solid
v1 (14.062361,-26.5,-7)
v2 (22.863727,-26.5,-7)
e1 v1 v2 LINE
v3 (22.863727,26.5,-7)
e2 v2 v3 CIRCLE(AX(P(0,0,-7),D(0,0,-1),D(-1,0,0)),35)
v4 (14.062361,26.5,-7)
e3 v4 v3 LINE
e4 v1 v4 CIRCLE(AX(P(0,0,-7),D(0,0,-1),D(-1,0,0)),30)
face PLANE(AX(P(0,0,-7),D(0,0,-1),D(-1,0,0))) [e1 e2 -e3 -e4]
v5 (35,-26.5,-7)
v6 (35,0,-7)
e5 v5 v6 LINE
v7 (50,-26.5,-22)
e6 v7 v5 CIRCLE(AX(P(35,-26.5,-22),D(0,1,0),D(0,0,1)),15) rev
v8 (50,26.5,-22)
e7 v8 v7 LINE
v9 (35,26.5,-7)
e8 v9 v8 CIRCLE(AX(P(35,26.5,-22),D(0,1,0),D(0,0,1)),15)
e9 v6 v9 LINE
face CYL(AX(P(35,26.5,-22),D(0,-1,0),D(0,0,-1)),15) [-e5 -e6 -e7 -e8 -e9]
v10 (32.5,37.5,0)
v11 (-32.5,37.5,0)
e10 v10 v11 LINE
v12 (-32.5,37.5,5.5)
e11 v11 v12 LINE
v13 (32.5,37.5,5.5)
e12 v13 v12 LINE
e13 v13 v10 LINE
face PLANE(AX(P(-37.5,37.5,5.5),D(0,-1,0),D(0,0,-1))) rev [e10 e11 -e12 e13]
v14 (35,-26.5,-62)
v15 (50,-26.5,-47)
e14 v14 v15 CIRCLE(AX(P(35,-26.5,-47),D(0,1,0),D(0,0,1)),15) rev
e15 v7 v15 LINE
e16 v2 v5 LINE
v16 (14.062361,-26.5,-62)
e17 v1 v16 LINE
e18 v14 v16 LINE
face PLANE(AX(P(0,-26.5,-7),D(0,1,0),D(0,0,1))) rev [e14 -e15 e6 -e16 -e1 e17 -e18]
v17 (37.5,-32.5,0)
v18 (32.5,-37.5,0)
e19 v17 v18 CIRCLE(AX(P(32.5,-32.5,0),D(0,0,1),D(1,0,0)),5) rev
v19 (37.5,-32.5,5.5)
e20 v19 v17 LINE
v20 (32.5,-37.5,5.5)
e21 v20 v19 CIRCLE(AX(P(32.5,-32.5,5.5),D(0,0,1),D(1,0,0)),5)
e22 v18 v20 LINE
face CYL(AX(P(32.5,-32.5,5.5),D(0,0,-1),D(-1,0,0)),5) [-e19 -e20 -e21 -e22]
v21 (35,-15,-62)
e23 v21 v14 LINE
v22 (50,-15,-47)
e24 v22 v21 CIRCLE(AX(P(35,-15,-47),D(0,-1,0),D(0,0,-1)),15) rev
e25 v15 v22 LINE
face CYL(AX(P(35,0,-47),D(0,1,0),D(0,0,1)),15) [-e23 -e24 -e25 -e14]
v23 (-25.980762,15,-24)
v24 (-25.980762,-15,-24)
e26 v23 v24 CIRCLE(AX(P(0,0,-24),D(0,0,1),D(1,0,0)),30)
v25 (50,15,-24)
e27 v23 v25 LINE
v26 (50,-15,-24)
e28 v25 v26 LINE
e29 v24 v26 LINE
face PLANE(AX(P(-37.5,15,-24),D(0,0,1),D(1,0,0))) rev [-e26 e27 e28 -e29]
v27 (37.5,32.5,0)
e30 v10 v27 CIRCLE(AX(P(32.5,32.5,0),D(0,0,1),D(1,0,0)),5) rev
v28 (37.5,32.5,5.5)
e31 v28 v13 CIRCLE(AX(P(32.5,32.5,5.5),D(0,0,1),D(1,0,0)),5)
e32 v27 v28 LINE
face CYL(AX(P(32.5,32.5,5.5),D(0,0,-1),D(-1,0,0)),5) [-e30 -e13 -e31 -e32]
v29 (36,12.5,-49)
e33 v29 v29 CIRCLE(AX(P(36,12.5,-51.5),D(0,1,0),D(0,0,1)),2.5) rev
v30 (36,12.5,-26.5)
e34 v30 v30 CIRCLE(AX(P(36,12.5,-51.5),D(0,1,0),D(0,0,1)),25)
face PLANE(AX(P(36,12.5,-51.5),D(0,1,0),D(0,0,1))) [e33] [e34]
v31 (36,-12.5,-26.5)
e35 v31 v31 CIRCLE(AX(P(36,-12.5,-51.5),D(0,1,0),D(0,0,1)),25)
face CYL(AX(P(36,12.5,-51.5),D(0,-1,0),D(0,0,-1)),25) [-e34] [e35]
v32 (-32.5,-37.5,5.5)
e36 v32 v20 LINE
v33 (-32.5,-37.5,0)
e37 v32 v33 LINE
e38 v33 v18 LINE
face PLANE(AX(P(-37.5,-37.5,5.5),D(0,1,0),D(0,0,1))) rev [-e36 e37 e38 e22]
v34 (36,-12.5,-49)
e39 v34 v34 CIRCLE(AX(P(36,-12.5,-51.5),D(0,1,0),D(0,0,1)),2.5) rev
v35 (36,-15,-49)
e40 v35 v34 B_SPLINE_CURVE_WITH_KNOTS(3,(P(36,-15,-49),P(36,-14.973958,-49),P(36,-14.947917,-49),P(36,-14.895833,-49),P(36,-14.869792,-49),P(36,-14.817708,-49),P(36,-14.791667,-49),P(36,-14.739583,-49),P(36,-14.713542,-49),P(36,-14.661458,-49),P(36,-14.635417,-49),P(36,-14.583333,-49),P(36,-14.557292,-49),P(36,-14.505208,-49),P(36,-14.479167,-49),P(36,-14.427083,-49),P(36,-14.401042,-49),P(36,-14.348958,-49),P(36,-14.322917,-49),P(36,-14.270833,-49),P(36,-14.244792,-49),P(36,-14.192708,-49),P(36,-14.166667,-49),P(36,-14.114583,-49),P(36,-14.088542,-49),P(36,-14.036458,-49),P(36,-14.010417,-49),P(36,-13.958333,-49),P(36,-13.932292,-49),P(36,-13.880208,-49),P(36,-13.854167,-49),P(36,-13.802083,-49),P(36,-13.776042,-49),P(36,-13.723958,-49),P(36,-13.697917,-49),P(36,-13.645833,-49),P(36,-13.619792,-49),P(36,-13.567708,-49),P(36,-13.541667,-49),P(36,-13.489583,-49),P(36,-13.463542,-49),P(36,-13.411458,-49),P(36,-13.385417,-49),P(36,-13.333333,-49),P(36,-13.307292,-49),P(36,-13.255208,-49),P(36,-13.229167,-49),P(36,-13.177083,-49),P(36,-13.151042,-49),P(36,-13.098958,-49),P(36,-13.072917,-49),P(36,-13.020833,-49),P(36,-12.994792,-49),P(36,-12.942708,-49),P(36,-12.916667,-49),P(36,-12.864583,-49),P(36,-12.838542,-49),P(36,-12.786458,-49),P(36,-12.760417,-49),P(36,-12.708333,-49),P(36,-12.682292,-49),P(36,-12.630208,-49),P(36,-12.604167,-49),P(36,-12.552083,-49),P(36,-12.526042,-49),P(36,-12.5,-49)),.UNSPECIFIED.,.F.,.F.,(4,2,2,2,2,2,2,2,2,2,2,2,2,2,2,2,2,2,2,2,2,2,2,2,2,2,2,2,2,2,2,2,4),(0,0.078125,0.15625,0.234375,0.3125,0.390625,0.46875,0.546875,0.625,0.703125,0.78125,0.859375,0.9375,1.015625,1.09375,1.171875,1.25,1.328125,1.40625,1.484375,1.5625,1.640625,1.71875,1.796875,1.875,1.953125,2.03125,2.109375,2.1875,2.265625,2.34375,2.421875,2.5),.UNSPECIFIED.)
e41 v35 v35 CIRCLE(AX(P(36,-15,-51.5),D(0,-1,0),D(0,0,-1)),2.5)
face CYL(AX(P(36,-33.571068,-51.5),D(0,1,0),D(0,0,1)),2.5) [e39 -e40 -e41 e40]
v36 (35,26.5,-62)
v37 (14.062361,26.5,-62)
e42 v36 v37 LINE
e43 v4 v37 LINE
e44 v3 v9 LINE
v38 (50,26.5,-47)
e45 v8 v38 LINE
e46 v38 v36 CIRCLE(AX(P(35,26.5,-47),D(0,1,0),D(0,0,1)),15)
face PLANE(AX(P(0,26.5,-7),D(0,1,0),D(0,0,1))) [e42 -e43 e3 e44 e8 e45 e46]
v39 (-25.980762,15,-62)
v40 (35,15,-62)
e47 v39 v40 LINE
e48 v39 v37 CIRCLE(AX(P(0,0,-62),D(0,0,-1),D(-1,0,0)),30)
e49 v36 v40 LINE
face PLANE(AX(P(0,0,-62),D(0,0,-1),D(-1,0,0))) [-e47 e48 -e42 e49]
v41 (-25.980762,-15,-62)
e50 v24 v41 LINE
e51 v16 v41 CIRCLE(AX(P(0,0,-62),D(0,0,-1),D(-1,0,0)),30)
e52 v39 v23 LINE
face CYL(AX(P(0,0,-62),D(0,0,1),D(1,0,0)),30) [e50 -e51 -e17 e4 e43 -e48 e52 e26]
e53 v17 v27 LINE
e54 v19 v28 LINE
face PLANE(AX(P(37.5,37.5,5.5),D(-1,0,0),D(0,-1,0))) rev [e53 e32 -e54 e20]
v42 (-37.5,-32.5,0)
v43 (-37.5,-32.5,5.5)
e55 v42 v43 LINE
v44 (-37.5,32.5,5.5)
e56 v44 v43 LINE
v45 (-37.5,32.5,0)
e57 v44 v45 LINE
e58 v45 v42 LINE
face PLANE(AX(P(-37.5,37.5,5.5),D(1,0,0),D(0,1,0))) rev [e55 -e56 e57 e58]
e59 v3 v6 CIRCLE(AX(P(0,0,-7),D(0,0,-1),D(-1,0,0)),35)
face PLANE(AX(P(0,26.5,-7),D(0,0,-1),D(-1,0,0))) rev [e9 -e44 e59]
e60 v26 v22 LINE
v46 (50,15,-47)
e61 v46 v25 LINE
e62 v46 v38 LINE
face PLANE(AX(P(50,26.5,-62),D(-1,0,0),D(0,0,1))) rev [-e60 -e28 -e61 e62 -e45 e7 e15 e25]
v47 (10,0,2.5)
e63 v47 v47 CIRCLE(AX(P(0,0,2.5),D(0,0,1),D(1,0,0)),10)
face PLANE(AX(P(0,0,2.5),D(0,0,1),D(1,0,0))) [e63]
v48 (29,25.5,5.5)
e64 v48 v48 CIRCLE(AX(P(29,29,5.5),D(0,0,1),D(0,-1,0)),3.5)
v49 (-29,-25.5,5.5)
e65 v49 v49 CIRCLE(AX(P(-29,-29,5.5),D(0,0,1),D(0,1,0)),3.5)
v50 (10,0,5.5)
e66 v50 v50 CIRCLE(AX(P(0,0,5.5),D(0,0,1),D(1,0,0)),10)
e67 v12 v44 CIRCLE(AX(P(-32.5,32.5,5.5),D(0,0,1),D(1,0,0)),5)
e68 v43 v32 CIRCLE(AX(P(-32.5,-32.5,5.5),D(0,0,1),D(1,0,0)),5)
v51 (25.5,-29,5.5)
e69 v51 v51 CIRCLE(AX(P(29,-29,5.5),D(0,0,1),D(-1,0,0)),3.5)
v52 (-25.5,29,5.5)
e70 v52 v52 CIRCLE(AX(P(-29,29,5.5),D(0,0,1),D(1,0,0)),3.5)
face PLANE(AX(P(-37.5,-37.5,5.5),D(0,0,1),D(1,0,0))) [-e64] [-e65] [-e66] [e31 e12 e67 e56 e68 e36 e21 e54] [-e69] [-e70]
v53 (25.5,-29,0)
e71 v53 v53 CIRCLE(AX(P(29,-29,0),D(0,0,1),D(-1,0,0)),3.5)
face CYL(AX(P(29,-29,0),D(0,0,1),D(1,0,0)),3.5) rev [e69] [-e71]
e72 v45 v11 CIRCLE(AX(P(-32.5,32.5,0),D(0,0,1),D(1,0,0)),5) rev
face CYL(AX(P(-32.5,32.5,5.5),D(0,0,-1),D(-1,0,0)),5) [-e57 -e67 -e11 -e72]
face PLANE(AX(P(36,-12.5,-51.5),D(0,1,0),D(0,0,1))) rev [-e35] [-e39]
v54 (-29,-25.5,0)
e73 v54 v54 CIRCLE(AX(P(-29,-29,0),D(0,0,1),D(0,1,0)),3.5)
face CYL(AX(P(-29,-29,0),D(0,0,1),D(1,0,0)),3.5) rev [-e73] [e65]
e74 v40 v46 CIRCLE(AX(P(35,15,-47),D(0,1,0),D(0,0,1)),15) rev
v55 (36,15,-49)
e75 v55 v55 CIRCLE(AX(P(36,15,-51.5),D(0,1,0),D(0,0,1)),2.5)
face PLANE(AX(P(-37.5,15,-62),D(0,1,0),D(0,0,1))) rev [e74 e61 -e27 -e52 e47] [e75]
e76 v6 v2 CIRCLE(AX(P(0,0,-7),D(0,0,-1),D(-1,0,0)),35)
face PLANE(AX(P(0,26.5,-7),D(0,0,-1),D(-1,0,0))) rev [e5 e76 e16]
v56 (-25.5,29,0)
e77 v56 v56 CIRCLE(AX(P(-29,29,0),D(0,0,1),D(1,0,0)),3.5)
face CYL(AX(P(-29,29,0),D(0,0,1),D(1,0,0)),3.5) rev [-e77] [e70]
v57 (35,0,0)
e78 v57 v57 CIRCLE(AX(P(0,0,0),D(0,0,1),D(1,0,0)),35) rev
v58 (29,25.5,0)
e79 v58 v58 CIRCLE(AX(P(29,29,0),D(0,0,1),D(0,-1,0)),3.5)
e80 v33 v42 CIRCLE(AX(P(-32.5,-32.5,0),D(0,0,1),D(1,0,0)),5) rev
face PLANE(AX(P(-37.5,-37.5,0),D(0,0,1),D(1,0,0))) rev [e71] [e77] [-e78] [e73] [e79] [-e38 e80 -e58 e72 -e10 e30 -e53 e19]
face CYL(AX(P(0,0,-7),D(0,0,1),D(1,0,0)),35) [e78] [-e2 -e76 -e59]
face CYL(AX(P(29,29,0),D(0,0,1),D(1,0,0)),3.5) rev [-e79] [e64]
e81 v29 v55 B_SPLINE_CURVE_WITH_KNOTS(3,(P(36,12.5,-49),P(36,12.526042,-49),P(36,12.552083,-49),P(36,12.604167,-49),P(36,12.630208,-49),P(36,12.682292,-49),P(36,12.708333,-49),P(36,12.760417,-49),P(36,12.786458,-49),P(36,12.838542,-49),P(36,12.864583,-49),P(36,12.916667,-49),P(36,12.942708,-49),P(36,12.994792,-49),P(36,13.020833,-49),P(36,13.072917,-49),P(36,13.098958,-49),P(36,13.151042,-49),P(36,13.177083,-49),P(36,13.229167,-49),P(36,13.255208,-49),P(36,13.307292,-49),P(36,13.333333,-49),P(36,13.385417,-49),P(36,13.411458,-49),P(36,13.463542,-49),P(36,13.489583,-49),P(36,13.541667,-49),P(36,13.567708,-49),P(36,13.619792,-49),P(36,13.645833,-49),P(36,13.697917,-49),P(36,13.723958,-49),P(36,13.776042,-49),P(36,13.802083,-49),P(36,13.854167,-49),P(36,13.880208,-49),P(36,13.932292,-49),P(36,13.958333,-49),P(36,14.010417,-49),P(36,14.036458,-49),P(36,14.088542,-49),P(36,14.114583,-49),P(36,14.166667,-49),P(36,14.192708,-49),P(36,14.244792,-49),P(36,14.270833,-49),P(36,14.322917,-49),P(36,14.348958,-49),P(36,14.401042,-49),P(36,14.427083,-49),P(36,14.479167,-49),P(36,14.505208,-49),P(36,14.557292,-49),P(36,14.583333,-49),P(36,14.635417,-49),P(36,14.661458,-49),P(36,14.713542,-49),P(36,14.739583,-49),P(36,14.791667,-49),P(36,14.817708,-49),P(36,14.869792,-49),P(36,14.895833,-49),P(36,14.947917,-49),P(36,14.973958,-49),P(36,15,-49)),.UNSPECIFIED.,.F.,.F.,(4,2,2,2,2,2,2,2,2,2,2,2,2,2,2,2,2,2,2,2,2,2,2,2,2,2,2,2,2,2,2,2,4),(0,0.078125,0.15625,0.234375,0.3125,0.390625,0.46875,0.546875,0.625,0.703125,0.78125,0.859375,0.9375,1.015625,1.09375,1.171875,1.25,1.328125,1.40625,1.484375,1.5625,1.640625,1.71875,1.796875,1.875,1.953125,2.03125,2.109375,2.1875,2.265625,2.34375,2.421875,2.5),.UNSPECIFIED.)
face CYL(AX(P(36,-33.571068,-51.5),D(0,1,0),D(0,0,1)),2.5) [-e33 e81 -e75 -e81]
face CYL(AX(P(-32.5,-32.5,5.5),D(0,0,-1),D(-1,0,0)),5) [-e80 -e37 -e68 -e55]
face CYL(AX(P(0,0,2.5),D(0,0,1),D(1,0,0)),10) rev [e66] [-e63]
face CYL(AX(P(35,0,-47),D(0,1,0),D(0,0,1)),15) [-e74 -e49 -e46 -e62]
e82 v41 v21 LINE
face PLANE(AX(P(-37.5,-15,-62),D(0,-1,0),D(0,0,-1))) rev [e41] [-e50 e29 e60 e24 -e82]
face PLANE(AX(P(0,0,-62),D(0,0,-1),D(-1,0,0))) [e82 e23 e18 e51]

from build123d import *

# Parameters (mm, degrees)
SKETCH_1_W               = 75
SKETCH_1_H               = 75
EXTRUDE_1_DEPTH          = 5.5
FILLET_1_R               = 5
SKETCH_2_R               = 3.5
CUT_EXTRUDE_1_DEPTH      = 54.31744555
PATTERN_CIRCULAR_1_COUNT = 4
SKETCH_3_R               = 10
CUT_EXTRUDE_2_DEPTH      = 3
SKETCH_4_R               = 35
EXTRUDE_2_DEPTH          = 7
SKETCH_5_R               = 30
EXTRUDE_3_DEPTH          = 55
SKETCH_6_W               = 50
SKETCH_6_H               = 55
EXTRUDE_4_DEPTH          = 26.5
FILLET_2_R               = 15
SKETCH_7_W               = 38
SKETCH_7_H               = 30
CUT_EXTRUDE_3_DEPTH      = 114.606777967
SKETCH_9_R               = 25
EXTRUDE_5_DEPTH          = 12.5
EXTRUDE_6_REACH          = 118.916
SKETCH_8_R               = 2.5
FILLET_3_R               = 15


with BuildPart() as part:
    # 草图1 → 拉伸1 (new body)
    with BuildSketch(Plane.XY):
        Rectangle(SKETCH_1_W, SKETCH_1_H)
    extrude(amount=EXTRUDE_1_DEPTH)

    # 圆角1
    fillet_1_edges = [part.edges().sort_by_distance(p)[0] for p in [
        (-37.5, 37.5, 2.75),
        (37.5, 37.5, 2.75),
        (37.5, -37.5, 2.75),
        (-37.5, -37.5, 2.75),
    ]]
    fillet(fillet_1_edges, radius=FILLET_1_R)

    # 草图2 → 切除-拉伸1 (cut, through all)
    with BuildSketch(Plane.XY.offset(5.5)):
        with Locations((-29, 29)):
            Circle(SKETCH_2_R)
    cut_extrude_1 = extrude(amount=-CUT_EXTRUDE_1_DEPTH, mode=Mode.SUBTRACT)

    # 阵列(圆周)1: 切除-拉伸1 ×4 about axis
    pattern_circular_1_axis = Axis((0, 0, 0), (0, 0, 1))
    for i in range(1, PATTERN_CIRCULAR_1_COUNT):
        add(cut_extrude_1.rotate(pattern_circular_1_axis, i * 360 / PATTERN_CIRCULAR_1_COUNT), mode=Mode.SUBTRACT)

    # 草图3 → 切除-拉伸2 (cut)
    with BuildSketch(Plane.XY.offset(5.5)):
        Circle(SKETCH_3_R)
    extrude(amount=-CUT_EXTRUDE_2_DEPTH, mode=Mode.SUBTRACT)

    # 草图4 → 拉伸2 (add)
    with BuildSketch(Plane(origin=(0, 0, 0), x_dir=(-1, 0, 0), z_dir=(0, 0, -1))):
        with Locations(Location((0, 0, 0), (0, 0, 180))):
            Circle(SKETCH_4_R)
    extrude(amount=EXTRUDE_2_DEPTH)

    # 草图5 → 拉伸3 (add)
    with BuildSketch(Plane(origin=(0, 0, -7), x_dir=(-1, 0, 0), z_dir=(0, 0, -1))):
        Circle(SKETCH_5_R)
    extrude(amount=EXTRUDE_3_DEPTH)

    # 草图6 → 拉伸4 (add, symmetric)
    with BuildSketch(Plane(origin=(0, 0, 0), x_dir=(1, 0, 0), z_dir=(0, 1, 0))):
        with Locations((25, 34.5)):
            Rectangle(SKETCH_6_W, SKETCH_6_H)
    extrude(amount=EXTRUDE_4_DEPTH, both=True)

    # 圆角2
    fillet_2_edges = [part.edges().sort_by_distance(p)[0] for p in [
        (50, 0, -7),
    ]]
    fillet(fillet_2_edges, radius=FILLET_2_R - 0.0001)  # a hair under: the kernel refuses the full size

    # 草图7 → 切除-拉伸3 (cut, through all)
    with BuildSketch(Plane(origin=(50, 0, 0), x_dir=(0, 0, -1), z_dir=(1, 0, 0))):
        with Locations((43, 0)):
            Rectangle(SKETCH_7_W, SKETCH_7_H)
    extrude(amount=-CUT_EXTRUDE_3_DEPTH, mode=Mode.SUBTRACT)

    # 拉伸6: up to this face of the body (flat: up to its plane)
    extrude_6_end = Plane(part.part.faces().sort_by_distance((31.665133936, -26.5, -35.104709871))[0])
    # 草图8 → 拉伸6 (add, up to the picked face)
    with BuildSketch(Plane(origin=(0, 26.5, 0), x_dir=(1, 0, 0), z_dir=(0, 1, 0)), mode=Mode.PRIVATE) as extrude_6_sk1:
        with Locations(Location((36, 51.5, 0), (0, 0, 270))):
            Circle(SKETCH_8_R)
    extrude_6_tool1 = split(extrude(extrude_6_sk1.sketch, amount=-EXTRUDE_6_REACH, mode=Mode.PRIVATE), bisect_by=extrude_6_end, keep=Keep.BOTH, mode=Mode.PRIVATE)


with BuildPart() as body_2:
    # 草图9 → 拉伸5 (new, symmetric)
    with BuildSketch(Plane(origin=(0, 0, 0), x_dir=(1, 0, 0), z_dir=(0, 1, 0))):
        with Locations(Location((36, 51.5, 0), (0, 0, 270))):
            Circle(SKETCH_9_R)
    extrude(amount=EXTRUDE_5_DEPTH, both=True)


with BuildPart() as part_1:
    add(part.part)

    add(body_2.part)  # 拉伸6 merges body 2
    add(extrude_6_tool1.solids().sort_by(Axis((36, 26.5, -51.5), (0, -1, 0)))[0])

    # 圆角3
    fillet_3_edges = [part_1.edges().sort_by_distance(p)[0] for p in [
        (50, 20.75, -62),
        (50, -20.75, -62),
    ]]
    fillet(fillet_3_edges, radius=FILLET_3_R)


solid = part_1.part
